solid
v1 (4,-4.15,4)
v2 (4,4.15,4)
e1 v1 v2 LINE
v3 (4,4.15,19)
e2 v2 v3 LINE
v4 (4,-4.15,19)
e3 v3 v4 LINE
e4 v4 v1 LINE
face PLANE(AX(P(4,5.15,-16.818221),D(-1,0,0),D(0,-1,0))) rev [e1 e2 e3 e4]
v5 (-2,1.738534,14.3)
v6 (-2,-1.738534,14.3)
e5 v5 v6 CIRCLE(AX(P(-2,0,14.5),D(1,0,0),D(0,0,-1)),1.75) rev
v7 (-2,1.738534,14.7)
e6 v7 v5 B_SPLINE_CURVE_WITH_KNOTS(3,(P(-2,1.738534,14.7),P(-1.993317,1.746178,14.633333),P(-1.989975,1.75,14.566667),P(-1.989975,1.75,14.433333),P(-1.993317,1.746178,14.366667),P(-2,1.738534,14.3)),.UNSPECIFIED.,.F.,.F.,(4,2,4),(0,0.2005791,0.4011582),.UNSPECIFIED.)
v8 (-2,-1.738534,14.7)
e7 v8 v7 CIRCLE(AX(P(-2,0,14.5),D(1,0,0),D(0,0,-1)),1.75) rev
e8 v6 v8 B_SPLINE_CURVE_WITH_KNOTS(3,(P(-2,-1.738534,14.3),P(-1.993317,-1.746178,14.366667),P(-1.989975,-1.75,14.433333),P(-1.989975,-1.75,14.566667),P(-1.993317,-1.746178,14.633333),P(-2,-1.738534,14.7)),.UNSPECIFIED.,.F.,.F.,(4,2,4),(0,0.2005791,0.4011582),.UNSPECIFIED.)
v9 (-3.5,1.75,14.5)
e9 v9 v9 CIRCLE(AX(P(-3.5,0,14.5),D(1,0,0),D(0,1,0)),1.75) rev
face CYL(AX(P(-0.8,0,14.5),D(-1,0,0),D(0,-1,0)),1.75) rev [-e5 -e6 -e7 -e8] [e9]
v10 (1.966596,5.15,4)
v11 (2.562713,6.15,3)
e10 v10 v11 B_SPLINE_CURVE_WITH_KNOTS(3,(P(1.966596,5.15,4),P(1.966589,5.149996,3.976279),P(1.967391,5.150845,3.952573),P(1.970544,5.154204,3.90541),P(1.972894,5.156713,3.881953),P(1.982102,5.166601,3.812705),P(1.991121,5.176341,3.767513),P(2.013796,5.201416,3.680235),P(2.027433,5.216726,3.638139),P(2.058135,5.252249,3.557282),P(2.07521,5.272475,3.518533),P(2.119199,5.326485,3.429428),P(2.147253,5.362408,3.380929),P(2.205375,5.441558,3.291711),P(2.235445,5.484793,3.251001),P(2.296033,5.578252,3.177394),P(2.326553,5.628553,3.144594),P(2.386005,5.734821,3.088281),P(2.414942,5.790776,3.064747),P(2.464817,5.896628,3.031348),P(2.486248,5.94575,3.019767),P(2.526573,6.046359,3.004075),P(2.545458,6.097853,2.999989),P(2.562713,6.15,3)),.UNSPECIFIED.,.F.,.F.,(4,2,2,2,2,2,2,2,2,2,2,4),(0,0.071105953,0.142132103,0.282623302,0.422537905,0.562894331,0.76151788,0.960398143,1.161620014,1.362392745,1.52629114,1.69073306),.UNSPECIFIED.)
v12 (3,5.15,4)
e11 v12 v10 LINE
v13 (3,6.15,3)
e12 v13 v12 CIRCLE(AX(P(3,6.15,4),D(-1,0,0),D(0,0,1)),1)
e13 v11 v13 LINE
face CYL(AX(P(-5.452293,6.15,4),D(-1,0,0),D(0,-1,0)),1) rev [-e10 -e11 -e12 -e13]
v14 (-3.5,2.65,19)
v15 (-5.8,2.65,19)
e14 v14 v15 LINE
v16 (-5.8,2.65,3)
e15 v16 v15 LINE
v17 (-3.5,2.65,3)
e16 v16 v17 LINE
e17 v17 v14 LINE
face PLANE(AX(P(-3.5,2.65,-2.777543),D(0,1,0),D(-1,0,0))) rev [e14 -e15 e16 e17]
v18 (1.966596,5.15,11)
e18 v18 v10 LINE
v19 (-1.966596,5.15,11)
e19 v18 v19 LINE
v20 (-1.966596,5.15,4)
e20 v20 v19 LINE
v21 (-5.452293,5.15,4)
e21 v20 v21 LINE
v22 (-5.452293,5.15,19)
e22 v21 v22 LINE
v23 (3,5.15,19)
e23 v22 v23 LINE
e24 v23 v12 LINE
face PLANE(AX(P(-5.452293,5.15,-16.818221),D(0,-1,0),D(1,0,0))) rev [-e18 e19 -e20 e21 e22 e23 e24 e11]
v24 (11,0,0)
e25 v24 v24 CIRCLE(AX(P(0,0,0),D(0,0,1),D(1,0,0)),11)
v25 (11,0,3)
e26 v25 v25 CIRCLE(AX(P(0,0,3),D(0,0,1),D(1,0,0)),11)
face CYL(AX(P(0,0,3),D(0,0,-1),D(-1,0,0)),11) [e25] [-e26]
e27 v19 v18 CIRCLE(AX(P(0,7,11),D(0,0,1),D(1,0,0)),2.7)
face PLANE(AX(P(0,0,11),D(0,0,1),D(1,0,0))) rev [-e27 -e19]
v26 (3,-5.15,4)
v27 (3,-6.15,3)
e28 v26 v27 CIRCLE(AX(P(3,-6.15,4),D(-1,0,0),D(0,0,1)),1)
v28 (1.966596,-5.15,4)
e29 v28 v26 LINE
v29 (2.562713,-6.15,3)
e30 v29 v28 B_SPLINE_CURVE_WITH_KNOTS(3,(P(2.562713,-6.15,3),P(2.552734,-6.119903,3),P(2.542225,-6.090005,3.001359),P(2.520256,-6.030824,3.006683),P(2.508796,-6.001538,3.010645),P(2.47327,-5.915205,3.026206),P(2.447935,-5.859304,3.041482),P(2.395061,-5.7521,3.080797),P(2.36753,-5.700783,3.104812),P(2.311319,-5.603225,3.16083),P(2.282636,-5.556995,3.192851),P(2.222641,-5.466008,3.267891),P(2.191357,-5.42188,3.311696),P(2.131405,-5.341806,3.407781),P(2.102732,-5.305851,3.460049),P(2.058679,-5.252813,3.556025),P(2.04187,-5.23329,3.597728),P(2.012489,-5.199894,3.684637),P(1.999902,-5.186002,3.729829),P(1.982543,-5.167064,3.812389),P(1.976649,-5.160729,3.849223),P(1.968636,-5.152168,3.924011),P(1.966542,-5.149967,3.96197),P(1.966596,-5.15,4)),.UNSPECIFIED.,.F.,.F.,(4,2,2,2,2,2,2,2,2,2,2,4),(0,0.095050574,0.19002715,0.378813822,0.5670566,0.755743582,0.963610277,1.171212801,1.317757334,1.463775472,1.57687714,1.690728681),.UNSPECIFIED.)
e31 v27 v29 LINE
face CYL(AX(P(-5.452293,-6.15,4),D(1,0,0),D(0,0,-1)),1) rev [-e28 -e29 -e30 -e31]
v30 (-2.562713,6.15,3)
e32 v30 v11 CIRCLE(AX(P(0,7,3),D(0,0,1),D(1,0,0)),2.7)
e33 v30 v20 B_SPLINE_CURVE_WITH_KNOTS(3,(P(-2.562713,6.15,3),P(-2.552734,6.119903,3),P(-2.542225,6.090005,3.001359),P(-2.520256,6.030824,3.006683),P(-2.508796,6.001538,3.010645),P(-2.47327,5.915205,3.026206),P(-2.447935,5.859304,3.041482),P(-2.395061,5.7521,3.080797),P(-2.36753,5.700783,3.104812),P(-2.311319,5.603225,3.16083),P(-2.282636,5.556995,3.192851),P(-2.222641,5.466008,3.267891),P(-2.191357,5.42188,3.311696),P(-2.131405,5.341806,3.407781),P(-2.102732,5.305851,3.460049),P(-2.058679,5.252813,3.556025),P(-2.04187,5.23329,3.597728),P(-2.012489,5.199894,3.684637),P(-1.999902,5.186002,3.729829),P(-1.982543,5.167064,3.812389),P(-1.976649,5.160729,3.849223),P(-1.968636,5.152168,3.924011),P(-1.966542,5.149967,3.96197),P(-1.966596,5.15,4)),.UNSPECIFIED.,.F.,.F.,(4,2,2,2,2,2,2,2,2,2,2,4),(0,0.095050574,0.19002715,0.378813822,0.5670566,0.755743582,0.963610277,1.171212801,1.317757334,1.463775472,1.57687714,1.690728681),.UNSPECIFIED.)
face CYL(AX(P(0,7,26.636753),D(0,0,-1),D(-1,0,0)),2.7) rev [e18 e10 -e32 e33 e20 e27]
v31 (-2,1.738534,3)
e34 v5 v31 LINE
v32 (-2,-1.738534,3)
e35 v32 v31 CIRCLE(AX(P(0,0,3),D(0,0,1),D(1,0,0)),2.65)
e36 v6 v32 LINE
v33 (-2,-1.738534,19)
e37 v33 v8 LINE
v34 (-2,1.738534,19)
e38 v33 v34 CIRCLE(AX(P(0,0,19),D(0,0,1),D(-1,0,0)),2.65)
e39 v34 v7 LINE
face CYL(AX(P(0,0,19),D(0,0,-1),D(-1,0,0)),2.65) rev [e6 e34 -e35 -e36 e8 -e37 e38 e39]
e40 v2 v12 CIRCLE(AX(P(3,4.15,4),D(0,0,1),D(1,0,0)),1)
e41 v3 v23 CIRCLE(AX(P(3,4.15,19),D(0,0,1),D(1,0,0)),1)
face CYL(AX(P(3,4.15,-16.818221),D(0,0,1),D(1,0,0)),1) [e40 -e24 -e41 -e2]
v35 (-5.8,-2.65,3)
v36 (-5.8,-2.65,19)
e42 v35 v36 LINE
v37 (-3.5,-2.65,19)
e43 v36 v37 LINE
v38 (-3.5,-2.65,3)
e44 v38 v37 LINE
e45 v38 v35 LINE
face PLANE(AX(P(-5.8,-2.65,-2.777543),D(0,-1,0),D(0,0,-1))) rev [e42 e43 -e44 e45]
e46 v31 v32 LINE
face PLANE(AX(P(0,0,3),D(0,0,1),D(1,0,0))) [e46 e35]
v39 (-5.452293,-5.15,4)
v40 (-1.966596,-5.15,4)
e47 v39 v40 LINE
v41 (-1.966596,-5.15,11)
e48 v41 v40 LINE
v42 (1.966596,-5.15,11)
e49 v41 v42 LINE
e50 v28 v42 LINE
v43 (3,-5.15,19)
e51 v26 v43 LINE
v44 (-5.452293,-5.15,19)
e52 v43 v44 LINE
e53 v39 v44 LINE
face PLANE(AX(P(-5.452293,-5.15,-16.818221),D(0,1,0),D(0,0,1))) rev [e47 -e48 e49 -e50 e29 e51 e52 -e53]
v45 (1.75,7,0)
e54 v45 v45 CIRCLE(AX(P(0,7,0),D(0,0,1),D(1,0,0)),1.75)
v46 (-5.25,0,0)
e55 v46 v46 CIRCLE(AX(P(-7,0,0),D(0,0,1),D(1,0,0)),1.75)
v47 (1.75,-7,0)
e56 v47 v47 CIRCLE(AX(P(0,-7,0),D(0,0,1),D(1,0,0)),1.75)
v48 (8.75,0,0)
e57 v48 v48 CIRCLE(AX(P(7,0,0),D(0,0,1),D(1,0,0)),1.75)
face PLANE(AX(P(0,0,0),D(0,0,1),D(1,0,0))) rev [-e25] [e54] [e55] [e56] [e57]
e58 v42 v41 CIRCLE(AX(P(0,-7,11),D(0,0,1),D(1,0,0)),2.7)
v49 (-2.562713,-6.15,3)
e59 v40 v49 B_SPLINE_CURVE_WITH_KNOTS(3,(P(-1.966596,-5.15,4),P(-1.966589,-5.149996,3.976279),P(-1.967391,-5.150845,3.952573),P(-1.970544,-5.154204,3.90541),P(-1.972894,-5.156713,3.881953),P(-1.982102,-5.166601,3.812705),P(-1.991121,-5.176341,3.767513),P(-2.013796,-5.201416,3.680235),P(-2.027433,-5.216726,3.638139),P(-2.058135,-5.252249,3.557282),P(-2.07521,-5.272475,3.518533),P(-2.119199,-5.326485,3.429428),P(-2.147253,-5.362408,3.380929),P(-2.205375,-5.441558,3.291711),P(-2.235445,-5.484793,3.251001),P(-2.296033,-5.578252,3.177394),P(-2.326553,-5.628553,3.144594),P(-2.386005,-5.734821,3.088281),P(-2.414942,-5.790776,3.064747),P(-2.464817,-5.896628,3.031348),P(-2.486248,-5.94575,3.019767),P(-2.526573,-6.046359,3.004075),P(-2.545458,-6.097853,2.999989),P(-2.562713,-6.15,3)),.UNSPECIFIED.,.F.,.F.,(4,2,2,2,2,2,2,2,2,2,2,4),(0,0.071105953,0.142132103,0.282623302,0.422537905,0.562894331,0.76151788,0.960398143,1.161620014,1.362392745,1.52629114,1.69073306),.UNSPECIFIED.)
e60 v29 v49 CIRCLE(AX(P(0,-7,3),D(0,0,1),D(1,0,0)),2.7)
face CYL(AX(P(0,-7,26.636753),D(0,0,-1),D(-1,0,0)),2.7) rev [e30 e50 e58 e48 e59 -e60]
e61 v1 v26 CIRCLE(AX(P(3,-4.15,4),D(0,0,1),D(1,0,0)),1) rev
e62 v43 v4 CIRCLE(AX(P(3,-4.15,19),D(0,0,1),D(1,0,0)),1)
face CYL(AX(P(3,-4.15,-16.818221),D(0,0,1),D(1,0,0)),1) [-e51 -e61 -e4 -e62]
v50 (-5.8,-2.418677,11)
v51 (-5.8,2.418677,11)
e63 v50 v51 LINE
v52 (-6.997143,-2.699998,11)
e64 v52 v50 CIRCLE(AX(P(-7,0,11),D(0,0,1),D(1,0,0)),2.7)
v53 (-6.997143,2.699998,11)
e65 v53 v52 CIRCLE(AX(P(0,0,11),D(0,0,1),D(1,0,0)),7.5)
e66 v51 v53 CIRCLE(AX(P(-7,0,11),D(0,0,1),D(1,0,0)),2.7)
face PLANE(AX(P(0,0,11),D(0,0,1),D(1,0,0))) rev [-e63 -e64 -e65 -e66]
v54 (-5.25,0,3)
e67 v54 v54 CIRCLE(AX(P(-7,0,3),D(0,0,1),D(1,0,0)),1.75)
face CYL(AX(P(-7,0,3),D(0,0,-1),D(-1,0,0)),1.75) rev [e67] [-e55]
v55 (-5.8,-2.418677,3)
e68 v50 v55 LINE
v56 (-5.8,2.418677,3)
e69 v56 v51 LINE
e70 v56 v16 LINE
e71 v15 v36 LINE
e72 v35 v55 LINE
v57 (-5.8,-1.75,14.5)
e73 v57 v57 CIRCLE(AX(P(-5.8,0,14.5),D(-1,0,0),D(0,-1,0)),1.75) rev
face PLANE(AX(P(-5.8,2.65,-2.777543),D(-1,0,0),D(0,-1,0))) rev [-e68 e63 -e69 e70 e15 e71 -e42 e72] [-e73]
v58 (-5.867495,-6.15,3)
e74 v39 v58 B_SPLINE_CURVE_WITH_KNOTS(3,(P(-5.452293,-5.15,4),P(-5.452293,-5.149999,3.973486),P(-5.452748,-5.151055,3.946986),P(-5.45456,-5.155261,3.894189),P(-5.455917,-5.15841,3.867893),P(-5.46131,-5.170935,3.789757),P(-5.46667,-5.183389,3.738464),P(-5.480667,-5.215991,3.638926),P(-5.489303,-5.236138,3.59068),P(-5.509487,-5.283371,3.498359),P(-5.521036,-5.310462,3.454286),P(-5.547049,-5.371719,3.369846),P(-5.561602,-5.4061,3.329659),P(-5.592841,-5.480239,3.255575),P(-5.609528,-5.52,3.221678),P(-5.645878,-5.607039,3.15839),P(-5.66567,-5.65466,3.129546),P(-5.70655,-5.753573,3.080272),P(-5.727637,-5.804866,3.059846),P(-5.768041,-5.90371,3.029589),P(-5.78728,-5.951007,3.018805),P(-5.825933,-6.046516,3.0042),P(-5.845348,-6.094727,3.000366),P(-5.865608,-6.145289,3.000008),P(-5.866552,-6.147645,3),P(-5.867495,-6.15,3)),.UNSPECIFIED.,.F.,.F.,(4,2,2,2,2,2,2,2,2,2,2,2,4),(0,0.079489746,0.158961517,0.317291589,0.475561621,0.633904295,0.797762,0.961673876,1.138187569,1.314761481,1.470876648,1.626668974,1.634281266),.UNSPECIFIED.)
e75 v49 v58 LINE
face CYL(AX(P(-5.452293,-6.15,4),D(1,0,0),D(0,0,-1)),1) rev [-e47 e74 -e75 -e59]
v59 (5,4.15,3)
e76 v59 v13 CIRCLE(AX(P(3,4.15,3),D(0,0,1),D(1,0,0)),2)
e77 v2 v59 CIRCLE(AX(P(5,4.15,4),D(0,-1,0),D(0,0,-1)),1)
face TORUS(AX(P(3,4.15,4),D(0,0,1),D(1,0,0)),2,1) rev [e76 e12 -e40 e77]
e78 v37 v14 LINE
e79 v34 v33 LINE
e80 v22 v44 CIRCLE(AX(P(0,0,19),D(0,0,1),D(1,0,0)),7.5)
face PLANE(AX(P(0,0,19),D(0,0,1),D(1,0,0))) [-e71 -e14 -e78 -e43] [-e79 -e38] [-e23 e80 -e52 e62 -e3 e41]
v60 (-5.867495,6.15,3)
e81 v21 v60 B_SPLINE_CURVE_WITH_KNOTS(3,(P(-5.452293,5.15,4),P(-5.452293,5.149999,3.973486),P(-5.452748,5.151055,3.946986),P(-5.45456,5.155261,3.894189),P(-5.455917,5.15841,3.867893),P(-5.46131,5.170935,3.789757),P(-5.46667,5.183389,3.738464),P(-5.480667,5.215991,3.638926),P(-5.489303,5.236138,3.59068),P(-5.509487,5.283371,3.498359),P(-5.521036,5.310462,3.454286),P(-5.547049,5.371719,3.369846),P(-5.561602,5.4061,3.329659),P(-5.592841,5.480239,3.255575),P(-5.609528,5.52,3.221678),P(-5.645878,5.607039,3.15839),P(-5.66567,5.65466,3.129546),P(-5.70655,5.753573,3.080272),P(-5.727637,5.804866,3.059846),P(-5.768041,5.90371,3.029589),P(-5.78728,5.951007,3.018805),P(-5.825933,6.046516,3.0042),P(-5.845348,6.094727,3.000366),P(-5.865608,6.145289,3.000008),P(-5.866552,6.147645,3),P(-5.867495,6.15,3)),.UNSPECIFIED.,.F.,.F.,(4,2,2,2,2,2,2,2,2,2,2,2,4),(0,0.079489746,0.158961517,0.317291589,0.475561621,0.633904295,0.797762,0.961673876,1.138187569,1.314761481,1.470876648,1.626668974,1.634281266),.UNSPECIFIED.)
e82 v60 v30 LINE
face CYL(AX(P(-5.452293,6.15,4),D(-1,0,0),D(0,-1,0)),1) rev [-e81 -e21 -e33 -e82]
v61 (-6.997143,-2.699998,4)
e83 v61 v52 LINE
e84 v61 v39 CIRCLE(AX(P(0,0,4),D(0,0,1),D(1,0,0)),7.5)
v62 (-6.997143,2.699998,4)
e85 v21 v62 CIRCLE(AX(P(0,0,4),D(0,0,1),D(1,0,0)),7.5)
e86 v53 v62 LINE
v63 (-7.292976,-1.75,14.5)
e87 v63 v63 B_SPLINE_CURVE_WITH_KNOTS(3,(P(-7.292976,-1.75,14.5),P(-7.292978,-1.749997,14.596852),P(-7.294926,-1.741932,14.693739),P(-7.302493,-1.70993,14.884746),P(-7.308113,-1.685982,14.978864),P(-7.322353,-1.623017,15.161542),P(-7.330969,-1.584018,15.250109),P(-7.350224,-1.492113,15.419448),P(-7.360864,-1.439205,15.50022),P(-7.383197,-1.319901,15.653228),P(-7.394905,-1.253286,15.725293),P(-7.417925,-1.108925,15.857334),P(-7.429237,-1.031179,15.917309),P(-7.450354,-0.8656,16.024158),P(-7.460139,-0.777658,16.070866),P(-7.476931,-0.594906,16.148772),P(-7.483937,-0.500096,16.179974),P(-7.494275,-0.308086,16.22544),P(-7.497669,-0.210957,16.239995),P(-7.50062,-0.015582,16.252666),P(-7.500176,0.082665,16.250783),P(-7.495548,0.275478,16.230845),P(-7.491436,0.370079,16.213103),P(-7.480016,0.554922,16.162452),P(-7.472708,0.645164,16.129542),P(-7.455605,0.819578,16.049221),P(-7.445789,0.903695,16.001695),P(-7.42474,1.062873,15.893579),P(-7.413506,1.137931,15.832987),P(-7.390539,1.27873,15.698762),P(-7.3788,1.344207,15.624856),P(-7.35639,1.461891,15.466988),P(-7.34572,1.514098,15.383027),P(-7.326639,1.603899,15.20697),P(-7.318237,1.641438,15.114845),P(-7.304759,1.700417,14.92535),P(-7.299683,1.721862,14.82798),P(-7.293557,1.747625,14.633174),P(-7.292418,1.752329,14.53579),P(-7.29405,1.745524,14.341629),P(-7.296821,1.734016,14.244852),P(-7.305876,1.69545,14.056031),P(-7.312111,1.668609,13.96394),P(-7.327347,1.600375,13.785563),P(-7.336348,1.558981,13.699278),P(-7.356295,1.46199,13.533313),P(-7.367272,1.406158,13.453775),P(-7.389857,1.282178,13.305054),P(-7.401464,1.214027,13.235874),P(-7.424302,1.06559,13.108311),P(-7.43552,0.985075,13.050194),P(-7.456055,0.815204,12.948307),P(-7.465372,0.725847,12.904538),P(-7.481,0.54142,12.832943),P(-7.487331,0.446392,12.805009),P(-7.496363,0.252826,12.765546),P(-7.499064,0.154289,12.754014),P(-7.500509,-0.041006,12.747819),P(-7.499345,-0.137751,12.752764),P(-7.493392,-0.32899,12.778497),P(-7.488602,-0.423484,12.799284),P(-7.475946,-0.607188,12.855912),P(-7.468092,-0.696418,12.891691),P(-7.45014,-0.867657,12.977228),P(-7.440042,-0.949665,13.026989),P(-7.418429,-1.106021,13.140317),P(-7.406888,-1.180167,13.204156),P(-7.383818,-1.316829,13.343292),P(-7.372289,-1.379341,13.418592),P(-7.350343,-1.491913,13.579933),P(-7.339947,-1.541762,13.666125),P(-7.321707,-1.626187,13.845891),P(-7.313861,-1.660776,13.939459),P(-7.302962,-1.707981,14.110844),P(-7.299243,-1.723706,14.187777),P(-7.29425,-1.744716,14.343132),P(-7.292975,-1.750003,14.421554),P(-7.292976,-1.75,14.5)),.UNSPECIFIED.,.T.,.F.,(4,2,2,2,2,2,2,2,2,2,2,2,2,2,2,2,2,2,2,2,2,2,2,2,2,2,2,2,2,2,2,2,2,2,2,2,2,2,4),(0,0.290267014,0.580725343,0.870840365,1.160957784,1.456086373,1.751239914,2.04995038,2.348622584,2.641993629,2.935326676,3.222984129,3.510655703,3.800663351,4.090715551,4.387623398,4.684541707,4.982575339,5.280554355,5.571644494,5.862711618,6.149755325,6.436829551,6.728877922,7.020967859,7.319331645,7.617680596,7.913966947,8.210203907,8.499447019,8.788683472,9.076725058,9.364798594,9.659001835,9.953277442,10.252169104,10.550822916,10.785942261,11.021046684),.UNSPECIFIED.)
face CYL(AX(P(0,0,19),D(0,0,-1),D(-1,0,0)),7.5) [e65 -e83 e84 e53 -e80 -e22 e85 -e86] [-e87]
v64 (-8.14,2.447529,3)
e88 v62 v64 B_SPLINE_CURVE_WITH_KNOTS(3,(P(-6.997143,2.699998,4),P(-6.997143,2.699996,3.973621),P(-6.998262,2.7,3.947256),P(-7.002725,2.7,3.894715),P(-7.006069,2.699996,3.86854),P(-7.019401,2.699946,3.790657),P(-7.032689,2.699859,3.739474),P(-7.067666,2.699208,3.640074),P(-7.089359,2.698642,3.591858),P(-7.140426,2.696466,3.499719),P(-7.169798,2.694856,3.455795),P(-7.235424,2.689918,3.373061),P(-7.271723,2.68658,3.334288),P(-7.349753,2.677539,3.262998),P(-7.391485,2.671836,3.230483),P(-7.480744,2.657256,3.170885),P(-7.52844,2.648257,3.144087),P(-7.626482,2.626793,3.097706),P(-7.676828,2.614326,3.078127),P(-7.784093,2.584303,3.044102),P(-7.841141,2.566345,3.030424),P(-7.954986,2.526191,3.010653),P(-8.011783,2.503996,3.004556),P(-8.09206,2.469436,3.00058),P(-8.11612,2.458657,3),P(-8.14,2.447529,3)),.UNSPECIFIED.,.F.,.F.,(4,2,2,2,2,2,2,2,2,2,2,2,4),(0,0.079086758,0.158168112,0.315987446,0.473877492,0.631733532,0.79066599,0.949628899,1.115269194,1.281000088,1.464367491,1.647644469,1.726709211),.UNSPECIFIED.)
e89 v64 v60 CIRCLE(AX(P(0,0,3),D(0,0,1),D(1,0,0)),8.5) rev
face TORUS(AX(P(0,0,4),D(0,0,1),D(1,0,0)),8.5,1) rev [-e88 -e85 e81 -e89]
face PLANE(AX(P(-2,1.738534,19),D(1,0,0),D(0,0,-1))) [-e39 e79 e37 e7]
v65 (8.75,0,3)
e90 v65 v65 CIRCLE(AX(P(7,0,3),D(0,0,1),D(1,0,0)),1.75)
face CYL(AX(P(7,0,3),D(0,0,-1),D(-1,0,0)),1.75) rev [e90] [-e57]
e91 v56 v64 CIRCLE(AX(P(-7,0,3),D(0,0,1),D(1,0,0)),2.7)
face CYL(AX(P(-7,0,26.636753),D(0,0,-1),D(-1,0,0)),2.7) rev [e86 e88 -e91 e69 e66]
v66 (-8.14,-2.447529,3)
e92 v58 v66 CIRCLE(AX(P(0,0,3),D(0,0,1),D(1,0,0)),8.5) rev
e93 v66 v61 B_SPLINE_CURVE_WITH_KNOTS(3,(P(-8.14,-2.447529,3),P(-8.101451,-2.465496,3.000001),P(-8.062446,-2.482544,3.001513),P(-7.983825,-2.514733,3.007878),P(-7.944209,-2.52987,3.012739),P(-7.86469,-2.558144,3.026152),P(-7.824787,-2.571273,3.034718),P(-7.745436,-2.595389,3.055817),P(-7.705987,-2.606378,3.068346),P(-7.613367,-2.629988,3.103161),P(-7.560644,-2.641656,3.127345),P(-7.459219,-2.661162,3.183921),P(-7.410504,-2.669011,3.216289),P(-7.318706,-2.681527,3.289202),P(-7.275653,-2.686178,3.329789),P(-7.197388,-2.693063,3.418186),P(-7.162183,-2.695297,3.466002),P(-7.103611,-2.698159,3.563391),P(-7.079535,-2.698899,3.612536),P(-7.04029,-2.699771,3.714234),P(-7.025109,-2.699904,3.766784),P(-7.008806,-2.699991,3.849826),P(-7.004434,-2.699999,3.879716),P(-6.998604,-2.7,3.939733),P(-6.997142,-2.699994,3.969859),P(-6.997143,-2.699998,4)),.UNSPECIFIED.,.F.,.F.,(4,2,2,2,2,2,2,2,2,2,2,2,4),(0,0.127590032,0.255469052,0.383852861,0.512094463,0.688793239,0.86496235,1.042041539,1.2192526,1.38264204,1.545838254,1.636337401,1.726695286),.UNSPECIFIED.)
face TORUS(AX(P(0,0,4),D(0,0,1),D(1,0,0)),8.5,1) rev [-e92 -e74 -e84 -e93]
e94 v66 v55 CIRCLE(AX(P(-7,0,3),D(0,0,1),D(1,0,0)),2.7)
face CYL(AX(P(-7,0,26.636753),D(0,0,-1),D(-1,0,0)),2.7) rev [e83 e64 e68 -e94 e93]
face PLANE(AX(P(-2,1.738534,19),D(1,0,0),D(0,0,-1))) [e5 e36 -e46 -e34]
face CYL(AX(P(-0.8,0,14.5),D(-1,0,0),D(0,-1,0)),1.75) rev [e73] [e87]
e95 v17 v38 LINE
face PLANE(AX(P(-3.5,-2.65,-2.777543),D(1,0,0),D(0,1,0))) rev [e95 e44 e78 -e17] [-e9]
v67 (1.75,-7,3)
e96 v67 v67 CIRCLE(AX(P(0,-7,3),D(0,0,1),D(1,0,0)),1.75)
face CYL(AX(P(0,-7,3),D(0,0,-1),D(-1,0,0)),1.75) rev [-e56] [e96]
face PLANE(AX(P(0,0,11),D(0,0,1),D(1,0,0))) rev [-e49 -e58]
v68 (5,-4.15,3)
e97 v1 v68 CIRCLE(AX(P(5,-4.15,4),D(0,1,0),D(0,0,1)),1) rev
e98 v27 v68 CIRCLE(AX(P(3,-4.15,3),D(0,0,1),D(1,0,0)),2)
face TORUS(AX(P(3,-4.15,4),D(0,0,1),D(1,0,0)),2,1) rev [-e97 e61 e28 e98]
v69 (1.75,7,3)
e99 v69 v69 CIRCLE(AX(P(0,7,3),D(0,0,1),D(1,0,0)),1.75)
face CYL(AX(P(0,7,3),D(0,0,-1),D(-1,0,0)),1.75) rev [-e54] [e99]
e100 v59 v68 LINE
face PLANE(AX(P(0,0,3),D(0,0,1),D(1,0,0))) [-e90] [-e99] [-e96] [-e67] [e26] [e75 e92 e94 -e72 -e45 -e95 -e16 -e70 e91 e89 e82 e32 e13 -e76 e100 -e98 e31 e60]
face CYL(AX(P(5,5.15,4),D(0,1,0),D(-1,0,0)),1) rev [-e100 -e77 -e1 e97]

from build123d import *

# Parameters (mm, degrees)
SKETCH_1_R          = 11
SKETCH_1_R_2        = 1.75
EXTRUDE_1_DEPTH     = 3
SKETCH_2_R          = 7.5
EXTRUDE_2_DEPTH     = 16
SKETCH_10_W         = 2.3
SKETCH_10_H         = 5.3
CUT_EXTRUDE_4_DEPTH = 16
CUT_EXTRUDE_START   = -16
CUT_EXTRUDE_5_DEPTH = 16
SKETCH_13_R         = 2.7
CUT_EXTRUDE_6_DEPTH = 8
FILLET_1_R          = 1
SKETCH_15_R         = 1.75
CUT_EXTRUDE_7_DEPTH = 10


with BuildPart() as part:
    # 草图1 → 凸台-拉伸1 (new body)
    with BuildSketch(Plane.XY):
        Circle(SKETCH_1_R)
        with Locations((0, 7)):
            Circle(SKETCH_1_R_2, mode=Mode.SUBTRACT)
        with Locations((7, 0)):
            Circle(SKETCH_1_R_2, mode=Mode.SUBTRACT)
        with Locations((0, -7)):
            Circle(SKETCH_1_R_2, mode=Mode.SUBTRACT)
        with Locations((-7, 0)):
            Circle(SKETCH_1_R_2, mode=Mode.SUBTRACT)
    extrude(amount=EXTRUDE_1_DEPTH)

    # 草图2 → 凸台-拉伸2 (add)
    with BuildSketch(Plane.XY.offset(3)):
        with Locations(Location((0, 0, 0), (0, 0, 166.708822757))):
            Circle(SKETCH_2_R)
        with BuildLine():
            Line((-2, 1.738533865), (-2, -1.738533865))
            ThreePointArc((-2, -1.738533865), (-1.295035867, -2.31200824), (-0.437775279, -2.613590022))
            ThreePointArc((-0.437775279, -2.613590022), (2.018459157, -1.717068034), (2.50959842, 0.851126176))
            ThreePointArc((2.50959842, 0.851126176), (0.511659788, 2.600135431), (-2, 1.738533865))
        make_face(mode=Mode.SUBTRACT)
    extrude(amount=EXTRUDE_2_DEPTH)

    # 草图10 → 切除-拉伸4 (cut)
    with BuildSketch(Plane.XY.offset(19)):
        with Locations((-4.65, 0)):
            Rectangle(SKETCH_10_W, SKETCH_10_H)
    extrude(amount=-CUT_EXTRUDE_4_DEPTH, mode=Mode.SUBTRACT)

    # 草图12 → 切除-拉伸5 (cut)
    with BuildSketch(Plane.XY.offset(19).offset(CUT_EXTRUDE_START)):
        with BuildLine():
            Line((-5.452293096, 5.15), (4, 5.15))
            Line((4, 5.15), (4, -5.15))
            Line((4, -5.15), (-5.452293096, -5.15))
            ThreePointArc((-5.452293096, -5.15), (7.5, 0), (-5.452293096, 5.15))
        make_face()
    extrude(amount=CUT_EXTRUDE_5_DEPTH, mode=Mode.SUBTRACT)

    # 草图13 → 切除-拉伸6 (cut)
    with BuildSketch(Plane.XY.offset(3)):
        with Locations((0, 7)):
            Circle(SKETCH_13_R)
        with Locations((7, 0)):
            Circle(SKETCH_13_R)
        with Locations((0, -7)):
            Circle(SKETCH_13_R)
        with Locations((-7, 0)):
            Circle(SKETCH_13_R)
    extrude(amount=CUT_EXTRUDE_6_DEPTH, mode=Mode.SUBTRACT)

    # 圆角1
    # the kernel refuses this fillet: 1 mm, written as the material it adds along each edge
    with BuildSketch(Plane(origin=(0, 0, 3), x_dir=(-0.46227667345108353, 0.8867357425879484, 0), z_dir=(0.8867357425879484, 0.46227667345108353, 0))) as fillet_1_piece_1_section:
        with BuildLine():
            CenterArc((7.5 + FILLET_1_R, FILLET_1_R), FILLET_1_R, 180, 90)
            Line((7.5, FILLET_1_R), (7.5, 0))
            Line((7.5, 0), (7.5 + FILLET_1_R, 0))
        make_face()
    fillet_1_piece_1 = revolve(axis=Axis((0, 0, 3), (0, 0, 1)), revolution_arc=60.46476408, mode=Mode.PRIVATE)
    fillet_1_piece_1 = fillet_1_piece_1 - Plane(origin=(-7, 0, 3.226381538), x_dir=(1, 0, 0), z_dir=(0, 0, -1)) * Cylinder(2.7, 34, mode=Mode.PRIVATE)
    fillet_1_piece_1 = split(fillet_1_piece_1, bisect_by=Plane(origin=(-6.580020659, 5.15, 3.226381538), z_dir=(0, -1, 0)), keep=Keep.TOP, mode=Mode.PRIVATE)
    add(fillet_1_piece_1)
    with BuildSketch(Plane(origin=(0.533403956, -5.15, 3), x_dir=(0, -1, 0), z_dir=(-1, 0, 0))) as fillet_1_piece_2_section:
        with BuildLine():
            CenterArc((FILLET_1_R, FILLET_1_R), FILLET_1_R, 180, 90)
            Line((0, FILLET_1_R), (0, 0))
            Line((0, 0), (FILLET_1_R, 0))
        make_face()
    fillet_1_piece_2 = extrude(amount=8.485697052, mode=Mode.PRIVATE)
    fillet_1_piece_2 = fillet_1_piece_2 - Plane(origin=(0, -7, 3.242251881), x_dir=(1, 0, 0), z_dir=(0, 0, -1)) * Cylinder(2.7, 21, mode=Mode.PRIVATE)
    fillet_1_piece_2 = fillet_1_piece_2 & Plane(origin=(0, 0, 3.242251881), x_dir=(-0.9732142857144194, 0.2298998783848582, 0), z_dir=(0, 0, -1)) * Cylinder(7.5, 21, mode=Mode.PRIVATE)
    add(fillet_1_piece_2)
    with BuildSketch(Plane(origin=(-7.952293096, 5.15, 3), x_dir=(0, 1, 0), z_dir=(1, 0, 0))) as fillet_1_piece_3_section:
        with BuildLine():
            CenterArc((FILLET_1_R, FILLET_1_R), FILLET_1_R, 180, 90)
            Line((0, FILLET_1_R), (0, 0))
            Line((0, 0), (FILLET_1_R, 0))
        make_face()
    fillet_1_piece_3 = extrude(amount=8.485697052, mode=Mode.PRIVATE)
    fillet_1_piece_3 = fillet_1_piece_3 - Plane(origin=(0, 7, 3.242252003), x_dir=(1, 0, 0), z_dir=(0, 0, -1)) * Cylinder(2.7, 21, mode=Mode.PRIVATE)
    fillet_1_piece_3 = fillet_1_piece_3 & Plane(origin=(0, 0, 3.242252003), x_dir=(-0.9732142857144194, 0.2298998783848582, 0), z_dir=(0, 0, -1)) * Cylinder(7.5, 21, mode=Mode.PRIVATE)
    add(fillet_1_piece_3)
    with BuildSketch(Plane(origin=(0, 0, 3), x_dir=(-0.9993901440206632, -0.034919049734468105, 0), z_dir=(-0.034919049734468105, 0.9993901440206632, 0))) as fillet_1_piece_4_section:
        with BuildLine():
            CenterArc((7.5 + FILLET_1_R, FILLET_1_R), FILLET_1_R, 180, 90)
            Line((7.5, FILLET_1_R), (7.5, 0))
            Line((7.5, 0), (7.5 + FILLET_1_R, 0))
        make_face()
    fillet_1_piece_4 = revolve(axis=Axis((0, 0, 3), (0, 0, 1)), revolution_arc=60.46476408, mode=Mode.PRIVATE)
    fillet_1_piece_4 = fillet_1_piece_4 - Plane(origin=(-7, 0, 3.226381502), x_dir=(1, 0, 0), z_dir=(0, 0, -1)) * Cylinder(2.7, 35, mode=Mode.PRIVATE)
    fillet_1_piece_4 = split(fillet_1_piece_4, bisect_by=Plane(origin=(-6.580021181, -5.15, 3.226381502), z_dir=(0, 1, 0)), keep=Keep.TOP, mode=Mode.PRIVATE)
    add(fillet_1_piece_4)
    with BuildSketch(Plane(origin=(0, 0, 3), x_dir=(-0.46227667345108353, 0.8867357425879484, 0), z_dir=(0.8867357425879484, 0.46227667345108353, 0))) as fillet_1_piece_5a_section:
        with BuildLine():
            CenterArc((7.5 + FILLET_1_R, FILLET_1_R), FILLET_1_R, 180, 90)
            Line((7.5, FILLET_1_R), (7.5, 0))
            Line((7.5, 0), (7.5 + FILLET_1_R, 0))
        make_face()
    fillet_1_piece_5a = revolve(axis=Axis((0, 0, 3), (0, 0, 1)), revolution_arc=60.46476408, mode=Mode.PRIVATE)
    fillet_1_piece_5a = split(fillet_1_piece_5a, bisect_by=Plane(origin=(-4.735225186, 5.15, 3.214069689), z_dir=(0, 1, 0)), keep=Keep.TOP, mode=Mode.PRIVATE)
    with BuildSketch(Plane(origin=(-7.952293096, 5.15, 3), x_dir=(0, 1, 0), z_dir=(1, 0, 0))) as fillet_1_piece_5b_section:
        with BuildLine():
            CenterArc((FILLET_1_R, FILLET_1_R), FILLET_1_R, 180, 90)
            Line((0, FILLET_1_R), (0, 0))
            Line((0, 0), (FILLET_1_R, 0))
        make_face()
    fillet_1_piece_5b = extrude(amount=8.485697052, mode=Mode.PRIVATE)
    fillet_1_piece_5b = fillet_1_piece_5b - Plane(origin=(0, 0, 3.215737548), x_dir=(-0.9732142857144194, 0.2298998783848582, 0), z_dir=(0, 0, -1)) * Cylinder(7.5, 21, mode=Mode.PRIVATE)
    fillet_1_piece_5 = fillet_1_piece_5a & fillet_1_piece_5b
    add(fillet_1_piece_5)
    with BuildSketch(Plane(origin=(0.533403956, -5.15, 3), x_dir=(0, -1, 0), z_dir=(-1, 0, 0))) as fillet_1_piece_6a_section:
        with BuildLine():
            CenterArc((FILLET_1_R, FILLET_1_R), FILLET_1_R, 180, 90)
            Line((0, FILLET_1_R), (0, 0))
            Line((0, 0), (FILLET_1_R, 0))
        make_face()
    fillet_1_piece_6a = extrude(amount=8.485697052, mode=Mode.PRIVATE)
    fillet_1_piece_6a = fillet_1_piece_6a - Plane(origin=(0, 0, 3.215737542), x_dir=(-0.9732142857144194, 0.2298998783848582, 0), z_dir=(0, 0, -1)) * Cylinder(7.5, 21, mode=Mode.PRIVATE)
    with BuildSketch(Plane(origin=(0, 0, 3), x_dir=(-0.9993901440206632, -0.034919049734468105, 0), z_dir=(-0.034919049734468105, 0.9993901440206632, 0))) as fillet_1_piece_6b_section:
        with BuildLine():
            CenterArc((7.5 + FILLET_1_R, FILLET_1_R), FILLET_1_R, 180, 90)
            Line((7.5, FILLET_1_R), (7.5, 0))
            Line((7.5, 0), (7.5 + FILLET_1_R, 0))
        make_face()
    fillet_1_piece_6b = revolve(axis=Axis((0, 0, 3), (0, 0, 1)), revolution_arc=60.46476408, mode=Mode.PRIVATE)
    fillet_1_piece_6b = split(fillet_1_piece_6b, bisect_by=Plane(origin=(-4.735225263, -5.15, 3.214069799), z_dir=(0, -1, 0)), keep=Keep.TOP, mode=Mode.PRIVATE)
    fillet_1_piece_6 = fillet_1_piece_6a & fillet_1_piece_6b
    add(fillet_1_piece_6)
    # the kernel refuses this fillet: 1 mm, written as the material it takes off along each edge
    with BuildSketch(Plane(origin=(4, -5.15, 3), x_dir=(-1, 0, 0), z_dir=(0, 0, 1)), Plane(origin=(4, 5.15, 3), x_dir=(0, -1, 0), z_dir=(0, 0, 1))) as fillet_1_2_piece_1:
        with BuildLine():
            CenterArc((FILLET_1_R, -FILLET_1_R), FILLET_1_R, 90, 90)
            Line((0, -FILLET_1_R), (0, 0))
            Line((0, 0), (FILLET_1_R, 0))
        make_face()
    extrude(amount=18.5, mode=Mode.SUBTRACT)
    # the kernel refuses this fillet: 1 mm, written as the material it adds along each edge
    with BuildSketch(Plane(origin=(4, 4.15, 3), x_dir=(1, 0, 0), z_dir=(0, -1, 0))) as fillet_1_3_piece_1:
        with BuildLine():
            CenterArc((FILLET_1_R, FILLET_1_R), FILLET_1_R, 180, 90)
            Line((0, FILLET_1_R), (0, 0))
            Line((0, 0), (FILLET_1_R, 0))
        make_face()
    extrude(amount=8.3)
    with BuildSketch(Plane(origin=(-0.533403956, 5.15, 3), x_dir=(0, 1, 0), z_dir=(1, 0, 0))) as fillet_1_3_piece_2_section:
        with BuildLine():
            CenterArc((FILLET_1_R, FILLET_1_R), FILLET_1_R, 180, 90)
            Line((0, FILLET_1_R), (0, 0))
            Line((0, 0), (FILLET_1_R, 0))
        make_face()
    fillet_1_3_piece_2 = extrude(amount=3.533403956, mode=Mode.PRIVATE)
    fillet_1_3_piece_2 = fillet_1_3_piece_2 - Plane(origin=(0, 7, 3.249320301), x_dir=(1, 0, 0), z_dir=(0, 0, -1)) * Cylinder(2.7, 12, mode=Mode.PRIVATE)
    add(fillet_1_3_piece_2)
    with BuildSketch(Plane(origin=(3, -5.15, 3), x_dir=(0, -1, 0), z_dir=(-1, 0, 0))) as fillet_1_3_piece_3_section:
        with BuildLine():
            CenterArc((FILLET_1_R, FILLET_1_R), FILLET_1_R, 180, 90)
            Line((0, FILLET_1_R), (0, 0))
            Line((0, 0), (FILLET_1_R, 0))
        make_face()
    fillet_1_3_piece_3 = extrude(amount=3.533403956, mode=Mode.PRIVATE)
    fillet_1_3_piece_3 = fillet_1_3_piece_3 - Plane(origin=(0, -7, 3.249320301), x_dir=(1, 0, 0), z_dir=(0, 0, -1)) * Cylinder(2.7, 12, mode=Mode.PRIVATE)
    add(fillet_1_3_piece_3)
    with BuildSketch(Plane(origin=(3, -4.15, 3), x_dir=(0, -1, 0), z_dir=(-1, 0, 0))) as fillet_1_3_piece_4:
        with BuildLine():
            CenterArc((1 + FILLET_1_R, FILLET_1_R), FILLET_1_R, 180, 90)
            Line((1, FILLET_1_R), (1, 0))
            Line((1, 0), (1 + FILLET_1_R, 0))
        make_face()
    revolve(axis=Axis((3, -4.15, 3), (0, 0, 1)), revolution_arc=90)
    with BuildSketch(Plane(origin=(3, 4.15, 3), x_dir=(1, 0, 0), z_dir=(0, -1, 0))) as fillet_1_3_piece_5:
        with BuildLine():
            CenterArc((1 + FILLET_1_R, FILLET_1_R), FILLET_1_R, 180, 90)
            Line((1, FILLET_1_R), (1, 0))
            Line((1, 0), (1 + FILLET_1_R, 0))
        make_face()
    revolve(axis=Axis((3, 4.15, 3), (0, 0, 1)), revolution_arc=90)

    # 草图15 → 切除-拉伸7 (cut)
    with BuildSketch(Plane(origin=(-10.8, 0, 0), x_dir=(0, 0, -1), z_dir=(1, 0, 0))):
        with Locations(Location((-14.5, 0, 0), (0, 0, 263.437572131))):
            Circle(SKETCH_15_R)
    extrude(amount=CUT_EXTRUDE_7_DEPTH, mode=Mode.SUBTRACT)


solid = part.part
